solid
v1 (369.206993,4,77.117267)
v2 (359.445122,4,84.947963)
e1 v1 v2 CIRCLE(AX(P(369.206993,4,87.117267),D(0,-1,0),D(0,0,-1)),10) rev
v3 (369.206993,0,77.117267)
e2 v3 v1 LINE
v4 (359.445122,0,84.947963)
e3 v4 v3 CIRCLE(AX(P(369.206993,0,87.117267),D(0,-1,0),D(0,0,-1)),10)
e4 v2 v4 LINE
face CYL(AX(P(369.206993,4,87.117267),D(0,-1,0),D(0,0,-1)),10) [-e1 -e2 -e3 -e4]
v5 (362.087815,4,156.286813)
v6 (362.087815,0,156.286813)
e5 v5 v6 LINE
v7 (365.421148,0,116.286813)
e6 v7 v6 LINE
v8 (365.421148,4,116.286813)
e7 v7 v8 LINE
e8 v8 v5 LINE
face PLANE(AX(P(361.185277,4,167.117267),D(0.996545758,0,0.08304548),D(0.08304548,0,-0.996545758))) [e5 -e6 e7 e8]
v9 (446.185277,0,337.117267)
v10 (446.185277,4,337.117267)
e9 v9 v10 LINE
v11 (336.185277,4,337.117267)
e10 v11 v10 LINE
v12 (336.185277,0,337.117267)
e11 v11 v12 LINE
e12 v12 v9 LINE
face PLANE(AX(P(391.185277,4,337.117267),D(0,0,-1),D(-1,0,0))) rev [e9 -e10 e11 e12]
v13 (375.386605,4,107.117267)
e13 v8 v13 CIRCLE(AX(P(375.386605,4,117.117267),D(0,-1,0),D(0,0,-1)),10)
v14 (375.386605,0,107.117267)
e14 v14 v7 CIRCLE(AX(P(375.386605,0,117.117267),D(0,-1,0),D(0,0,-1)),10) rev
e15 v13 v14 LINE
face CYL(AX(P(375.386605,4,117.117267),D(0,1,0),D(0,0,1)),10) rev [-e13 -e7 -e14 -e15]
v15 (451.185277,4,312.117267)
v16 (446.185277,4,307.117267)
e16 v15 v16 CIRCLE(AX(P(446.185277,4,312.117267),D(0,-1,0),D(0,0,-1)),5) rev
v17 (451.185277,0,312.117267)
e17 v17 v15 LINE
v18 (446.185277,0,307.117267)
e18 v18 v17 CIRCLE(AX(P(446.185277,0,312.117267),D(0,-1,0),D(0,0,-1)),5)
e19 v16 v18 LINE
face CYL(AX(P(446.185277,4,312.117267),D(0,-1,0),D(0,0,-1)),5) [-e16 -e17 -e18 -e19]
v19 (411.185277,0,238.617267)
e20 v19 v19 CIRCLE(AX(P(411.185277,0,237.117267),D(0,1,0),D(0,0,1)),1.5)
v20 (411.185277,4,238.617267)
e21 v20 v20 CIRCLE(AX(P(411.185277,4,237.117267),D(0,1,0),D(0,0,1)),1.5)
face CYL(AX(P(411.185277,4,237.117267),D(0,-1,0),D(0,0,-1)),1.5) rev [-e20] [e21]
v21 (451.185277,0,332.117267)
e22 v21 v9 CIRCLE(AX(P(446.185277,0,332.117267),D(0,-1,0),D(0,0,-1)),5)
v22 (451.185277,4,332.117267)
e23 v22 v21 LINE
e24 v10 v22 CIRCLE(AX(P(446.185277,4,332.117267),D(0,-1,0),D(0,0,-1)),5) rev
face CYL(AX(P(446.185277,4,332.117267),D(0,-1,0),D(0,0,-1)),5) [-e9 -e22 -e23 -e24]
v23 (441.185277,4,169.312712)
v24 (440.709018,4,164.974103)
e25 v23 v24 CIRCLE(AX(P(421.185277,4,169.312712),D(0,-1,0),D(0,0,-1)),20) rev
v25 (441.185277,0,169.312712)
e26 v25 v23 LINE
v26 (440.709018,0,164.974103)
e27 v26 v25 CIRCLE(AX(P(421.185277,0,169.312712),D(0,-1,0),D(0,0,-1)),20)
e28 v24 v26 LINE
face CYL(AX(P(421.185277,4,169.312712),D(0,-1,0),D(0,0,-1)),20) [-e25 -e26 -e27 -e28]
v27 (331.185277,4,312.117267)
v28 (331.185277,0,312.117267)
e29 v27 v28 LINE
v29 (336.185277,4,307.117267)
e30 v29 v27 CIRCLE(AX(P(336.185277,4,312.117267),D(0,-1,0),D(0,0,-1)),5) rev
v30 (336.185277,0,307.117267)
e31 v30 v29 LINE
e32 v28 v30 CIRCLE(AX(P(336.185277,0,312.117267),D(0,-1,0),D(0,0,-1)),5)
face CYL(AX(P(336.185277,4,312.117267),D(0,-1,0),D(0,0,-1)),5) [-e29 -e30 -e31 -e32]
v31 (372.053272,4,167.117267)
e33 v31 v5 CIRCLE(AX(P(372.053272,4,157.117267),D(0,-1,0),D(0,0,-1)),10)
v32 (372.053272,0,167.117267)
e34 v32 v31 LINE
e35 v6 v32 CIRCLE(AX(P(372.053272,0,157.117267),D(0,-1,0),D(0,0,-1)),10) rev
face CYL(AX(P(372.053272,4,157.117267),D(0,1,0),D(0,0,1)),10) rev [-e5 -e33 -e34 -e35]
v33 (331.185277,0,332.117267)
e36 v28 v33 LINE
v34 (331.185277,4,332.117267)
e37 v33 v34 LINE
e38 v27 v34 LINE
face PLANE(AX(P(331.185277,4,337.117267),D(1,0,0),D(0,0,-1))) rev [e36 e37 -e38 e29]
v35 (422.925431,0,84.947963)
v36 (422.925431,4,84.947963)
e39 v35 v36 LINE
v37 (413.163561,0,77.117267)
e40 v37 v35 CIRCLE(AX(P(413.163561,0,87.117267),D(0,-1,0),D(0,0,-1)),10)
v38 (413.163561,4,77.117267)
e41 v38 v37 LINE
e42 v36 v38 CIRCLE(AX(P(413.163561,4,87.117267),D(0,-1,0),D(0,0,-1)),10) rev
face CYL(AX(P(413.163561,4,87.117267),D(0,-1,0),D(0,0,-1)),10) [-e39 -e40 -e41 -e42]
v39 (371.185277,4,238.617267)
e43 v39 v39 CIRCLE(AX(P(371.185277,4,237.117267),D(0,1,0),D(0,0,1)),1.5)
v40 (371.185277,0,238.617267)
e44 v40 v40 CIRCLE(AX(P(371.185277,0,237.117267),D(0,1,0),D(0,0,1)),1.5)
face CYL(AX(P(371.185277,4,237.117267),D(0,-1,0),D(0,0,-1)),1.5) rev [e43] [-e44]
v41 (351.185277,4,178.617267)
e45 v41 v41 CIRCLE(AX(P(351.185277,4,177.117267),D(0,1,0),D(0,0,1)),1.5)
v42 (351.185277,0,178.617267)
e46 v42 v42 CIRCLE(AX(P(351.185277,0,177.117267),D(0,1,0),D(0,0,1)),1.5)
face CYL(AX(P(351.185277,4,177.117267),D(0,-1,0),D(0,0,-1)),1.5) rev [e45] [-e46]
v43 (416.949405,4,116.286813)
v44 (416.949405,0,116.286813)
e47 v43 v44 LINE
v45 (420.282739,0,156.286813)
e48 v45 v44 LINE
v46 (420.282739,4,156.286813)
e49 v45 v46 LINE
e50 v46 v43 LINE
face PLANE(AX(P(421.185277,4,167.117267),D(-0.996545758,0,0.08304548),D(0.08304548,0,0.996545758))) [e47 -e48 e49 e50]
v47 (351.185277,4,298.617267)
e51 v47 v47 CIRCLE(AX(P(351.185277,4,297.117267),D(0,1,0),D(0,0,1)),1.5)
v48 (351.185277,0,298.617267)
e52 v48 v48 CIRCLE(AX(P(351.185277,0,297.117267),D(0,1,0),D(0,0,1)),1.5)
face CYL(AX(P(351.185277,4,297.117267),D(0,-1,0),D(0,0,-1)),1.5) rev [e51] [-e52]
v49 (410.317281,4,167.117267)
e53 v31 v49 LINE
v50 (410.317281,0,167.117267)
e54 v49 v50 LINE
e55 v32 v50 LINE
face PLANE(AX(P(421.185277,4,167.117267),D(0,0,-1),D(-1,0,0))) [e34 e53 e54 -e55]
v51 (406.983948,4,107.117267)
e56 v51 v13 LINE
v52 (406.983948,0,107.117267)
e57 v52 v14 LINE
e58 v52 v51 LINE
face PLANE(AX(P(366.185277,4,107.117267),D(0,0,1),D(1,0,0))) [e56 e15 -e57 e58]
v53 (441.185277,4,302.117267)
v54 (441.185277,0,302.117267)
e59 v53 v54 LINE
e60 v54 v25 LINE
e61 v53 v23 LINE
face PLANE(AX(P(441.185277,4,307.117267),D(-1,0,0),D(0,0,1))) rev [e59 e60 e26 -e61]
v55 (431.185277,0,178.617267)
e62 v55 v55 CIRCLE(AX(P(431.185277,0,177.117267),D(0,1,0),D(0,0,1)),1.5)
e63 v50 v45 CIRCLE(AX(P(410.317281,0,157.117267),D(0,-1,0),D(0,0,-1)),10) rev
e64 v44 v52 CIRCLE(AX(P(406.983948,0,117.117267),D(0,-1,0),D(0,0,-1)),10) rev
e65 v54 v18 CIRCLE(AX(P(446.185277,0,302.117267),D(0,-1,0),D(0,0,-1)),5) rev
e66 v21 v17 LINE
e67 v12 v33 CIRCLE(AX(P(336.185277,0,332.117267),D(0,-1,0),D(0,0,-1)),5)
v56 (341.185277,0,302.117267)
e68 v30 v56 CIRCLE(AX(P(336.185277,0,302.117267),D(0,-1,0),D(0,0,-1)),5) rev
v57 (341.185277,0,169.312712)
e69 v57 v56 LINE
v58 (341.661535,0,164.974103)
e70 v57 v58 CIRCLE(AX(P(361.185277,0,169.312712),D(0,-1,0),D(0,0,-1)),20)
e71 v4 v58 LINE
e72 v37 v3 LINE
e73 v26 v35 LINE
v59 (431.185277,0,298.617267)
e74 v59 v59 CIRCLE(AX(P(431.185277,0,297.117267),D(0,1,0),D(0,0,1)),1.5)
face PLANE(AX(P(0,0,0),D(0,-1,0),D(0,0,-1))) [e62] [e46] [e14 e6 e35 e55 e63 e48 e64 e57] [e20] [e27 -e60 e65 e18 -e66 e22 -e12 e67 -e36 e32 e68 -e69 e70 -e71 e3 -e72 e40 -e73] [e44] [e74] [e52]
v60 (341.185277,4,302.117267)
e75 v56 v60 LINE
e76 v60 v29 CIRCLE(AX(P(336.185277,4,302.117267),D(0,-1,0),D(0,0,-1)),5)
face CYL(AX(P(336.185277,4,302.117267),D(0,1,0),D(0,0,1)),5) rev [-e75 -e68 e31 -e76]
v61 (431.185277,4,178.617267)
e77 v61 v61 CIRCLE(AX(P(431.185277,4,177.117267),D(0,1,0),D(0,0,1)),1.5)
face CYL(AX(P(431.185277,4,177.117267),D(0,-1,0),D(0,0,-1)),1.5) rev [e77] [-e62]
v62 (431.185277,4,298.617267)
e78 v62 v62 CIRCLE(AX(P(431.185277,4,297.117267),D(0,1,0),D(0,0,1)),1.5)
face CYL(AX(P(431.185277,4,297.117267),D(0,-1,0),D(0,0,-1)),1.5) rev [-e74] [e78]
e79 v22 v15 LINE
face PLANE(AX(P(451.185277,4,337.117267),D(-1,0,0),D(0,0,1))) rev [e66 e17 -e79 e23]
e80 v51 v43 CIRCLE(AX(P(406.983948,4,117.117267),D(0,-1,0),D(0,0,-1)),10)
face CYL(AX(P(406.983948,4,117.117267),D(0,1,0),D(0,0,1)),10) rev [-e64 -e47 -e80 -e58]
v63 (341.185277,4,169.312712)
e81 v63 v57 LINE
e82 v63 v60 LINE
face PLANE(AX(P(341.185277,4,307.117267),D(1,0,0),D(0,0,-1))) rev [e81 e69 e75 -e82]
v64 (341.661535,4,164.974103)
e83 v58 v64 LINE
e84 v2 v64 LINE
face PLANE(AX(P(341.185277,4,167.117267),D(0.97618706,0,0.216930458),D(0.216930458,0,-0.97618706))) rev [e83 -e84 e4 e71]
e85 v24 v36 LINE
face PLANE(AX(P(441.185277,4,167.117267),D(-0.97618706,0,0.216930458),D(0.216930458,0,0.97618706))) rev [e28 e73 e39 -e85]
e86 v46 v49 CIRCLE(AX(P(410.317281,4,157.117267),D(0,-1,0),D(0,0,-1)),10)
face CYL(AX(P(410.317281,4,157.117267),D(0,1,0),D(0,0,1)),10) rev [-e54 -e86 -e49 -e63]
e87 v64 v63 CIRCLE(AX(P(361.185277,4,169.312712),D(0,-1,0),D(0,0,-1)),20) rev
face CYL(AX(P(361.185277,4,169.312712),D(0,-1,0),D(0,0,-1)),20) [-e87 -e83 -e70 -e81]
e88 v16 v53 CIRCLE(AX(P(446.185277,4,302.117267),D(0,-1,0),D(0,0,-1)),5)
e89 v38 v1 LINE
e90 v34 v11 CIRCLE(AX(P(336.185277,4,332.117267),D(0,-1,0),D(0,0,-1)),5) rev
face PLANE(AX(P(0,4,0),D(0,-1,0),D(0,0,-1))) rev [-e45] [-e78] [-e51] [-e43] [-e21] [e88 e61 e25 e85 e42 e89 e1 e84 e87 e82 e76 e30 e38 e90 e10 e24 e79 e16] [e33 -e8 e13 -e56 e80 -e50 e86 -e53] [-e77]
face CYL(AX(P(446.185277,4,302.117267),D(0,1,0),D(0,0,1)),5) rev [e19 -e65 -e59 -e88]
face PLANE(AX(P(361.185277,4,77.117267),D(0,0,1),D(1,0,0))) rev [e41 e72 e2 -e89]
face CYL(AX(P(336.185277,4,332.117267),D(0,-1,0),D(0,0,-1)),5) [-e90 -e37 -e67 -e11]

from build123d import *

# Parameters (mm, degrees)
SKETCH_1_R      = 1.5
EXTRUDE_1_DEPTH = 4
FILLET_1_R      = 5
FILLET_2_R      = 20
FILLET_3_R      = 10
FILLET_4_R      = 10


with BuildPart() as part:
    # Эскиз1 → Бобышка-Вытянуть1 (new body)
    with BuildSketch(Plane(origin=(0, 0, 0), x_dir=(1, 0, 0), z_dir=(0, 1, 0))):
        Polygon((341.185276631, -307.117267335), (341.185276631, -167.117267335), (361.185276631, -77.117267335), (421.185276631, -77.117267335), (441.185276631, -167.117267335), (441.185276631, -307.117267335), (451.185276631, -307.117267335), (451.185276631, -337.117267335), (391.185276631, -337.117267335), (331.185276631, -337.117267335), (331.185276631, -307.117267335), align=None)
        with Locations(Location((351.185276631, -177.117267335, 0), (0, 0, 270))):
            Circle(SKETCH_1_R, mode=Mode.SUBTRACT)
        with Locations(Location((431.185276631, -177.117267335, 0), (0, 0, 270))):
            Circle(SKETCH_1_R, mode=Mode.SUBTRACT)
        with Locations(Location((431.185276631, -297.117267335, 0), (0, 0, 270))):
            Circle(SKETCH_1_R, mode=Mode.SUBTRACT)
        with Locations(Location((351.185276631, -297.117267335, 0), (0, 0, 270))):
            Circle(SKETCH_1_R, mode=Mode.SUBTRACT)
        with Locations(Location((371.185276631, -237.117267335, 0), (0, 0, 270))):
            Circle(SKETCH_1_R, mode=Mode.SUBTRACT)
        with Locations(Location((411.185276631, -237.117267335, 0), (0, 0, 270))):
            Circle(SKETCH_1_R, mode=Mode.SUBTRACT)
        Polygon((361.185276631, -167.117267335), (366.185276631, -107.117267335), (416.185276631, -107.117267335), (421.185276631, -167.117267335), align=None, mode=Mode.SUBTRACT)
    extrude(amount=EXTRUDE_1_DEPTH)

    # Скругление1
    fillet_1_edges = [part.edges().sort_by_distance(p)[0] for p in [
        (441.185276631, 2, 307.117267335),
        (341.185276631, 2, 307.117267335),
        (331.185276631, 2, 307.117267335),
        (331.185276631, 2, 337.117267335),
        (451.185276631, 2, 337.117267335),
        (451.185276631, 2, 307.117267335),
    ]]
    fillet(fillet_1_edges, radius=FILLET_1_R - 0.0001)  # a hair under: the kernel refuses the full size

    # Скругление2
    fillet_2_edges = [part.edges().sort_by_distance(p)[0] for p in [
        (441.185276631, 2, 167.117267335),
        (341.185276631, 2, 167.117267335),
    ]]
    fillet(fillet_2_edges, radius=FILLET_2_R)

    # Скругление3
    fillet_3_edges = [part.edges().sort_by_distance(p)[0] for p in [
        (416.185276631, 2, 107.117267335),
        (366.185276631, 2, 107.117267335),
        (361.185276631, 2, 167.117267335),
        (421.185276631, 2, 167.117267335),
    ]]
    fillet(fillet_3_edges, radius=FILLET_3_R)

    # Скругление4
    fillet_4_edges = [part.edges().sort_by_distance(p)[0] for p in [
        (361.185276631, 2, 77.117267335),
        (421.185276631, 2, 77.117267335),
    ]]
    fillet(fillet_4_edges, radius=FILLET_4_R)


solid = part.part
